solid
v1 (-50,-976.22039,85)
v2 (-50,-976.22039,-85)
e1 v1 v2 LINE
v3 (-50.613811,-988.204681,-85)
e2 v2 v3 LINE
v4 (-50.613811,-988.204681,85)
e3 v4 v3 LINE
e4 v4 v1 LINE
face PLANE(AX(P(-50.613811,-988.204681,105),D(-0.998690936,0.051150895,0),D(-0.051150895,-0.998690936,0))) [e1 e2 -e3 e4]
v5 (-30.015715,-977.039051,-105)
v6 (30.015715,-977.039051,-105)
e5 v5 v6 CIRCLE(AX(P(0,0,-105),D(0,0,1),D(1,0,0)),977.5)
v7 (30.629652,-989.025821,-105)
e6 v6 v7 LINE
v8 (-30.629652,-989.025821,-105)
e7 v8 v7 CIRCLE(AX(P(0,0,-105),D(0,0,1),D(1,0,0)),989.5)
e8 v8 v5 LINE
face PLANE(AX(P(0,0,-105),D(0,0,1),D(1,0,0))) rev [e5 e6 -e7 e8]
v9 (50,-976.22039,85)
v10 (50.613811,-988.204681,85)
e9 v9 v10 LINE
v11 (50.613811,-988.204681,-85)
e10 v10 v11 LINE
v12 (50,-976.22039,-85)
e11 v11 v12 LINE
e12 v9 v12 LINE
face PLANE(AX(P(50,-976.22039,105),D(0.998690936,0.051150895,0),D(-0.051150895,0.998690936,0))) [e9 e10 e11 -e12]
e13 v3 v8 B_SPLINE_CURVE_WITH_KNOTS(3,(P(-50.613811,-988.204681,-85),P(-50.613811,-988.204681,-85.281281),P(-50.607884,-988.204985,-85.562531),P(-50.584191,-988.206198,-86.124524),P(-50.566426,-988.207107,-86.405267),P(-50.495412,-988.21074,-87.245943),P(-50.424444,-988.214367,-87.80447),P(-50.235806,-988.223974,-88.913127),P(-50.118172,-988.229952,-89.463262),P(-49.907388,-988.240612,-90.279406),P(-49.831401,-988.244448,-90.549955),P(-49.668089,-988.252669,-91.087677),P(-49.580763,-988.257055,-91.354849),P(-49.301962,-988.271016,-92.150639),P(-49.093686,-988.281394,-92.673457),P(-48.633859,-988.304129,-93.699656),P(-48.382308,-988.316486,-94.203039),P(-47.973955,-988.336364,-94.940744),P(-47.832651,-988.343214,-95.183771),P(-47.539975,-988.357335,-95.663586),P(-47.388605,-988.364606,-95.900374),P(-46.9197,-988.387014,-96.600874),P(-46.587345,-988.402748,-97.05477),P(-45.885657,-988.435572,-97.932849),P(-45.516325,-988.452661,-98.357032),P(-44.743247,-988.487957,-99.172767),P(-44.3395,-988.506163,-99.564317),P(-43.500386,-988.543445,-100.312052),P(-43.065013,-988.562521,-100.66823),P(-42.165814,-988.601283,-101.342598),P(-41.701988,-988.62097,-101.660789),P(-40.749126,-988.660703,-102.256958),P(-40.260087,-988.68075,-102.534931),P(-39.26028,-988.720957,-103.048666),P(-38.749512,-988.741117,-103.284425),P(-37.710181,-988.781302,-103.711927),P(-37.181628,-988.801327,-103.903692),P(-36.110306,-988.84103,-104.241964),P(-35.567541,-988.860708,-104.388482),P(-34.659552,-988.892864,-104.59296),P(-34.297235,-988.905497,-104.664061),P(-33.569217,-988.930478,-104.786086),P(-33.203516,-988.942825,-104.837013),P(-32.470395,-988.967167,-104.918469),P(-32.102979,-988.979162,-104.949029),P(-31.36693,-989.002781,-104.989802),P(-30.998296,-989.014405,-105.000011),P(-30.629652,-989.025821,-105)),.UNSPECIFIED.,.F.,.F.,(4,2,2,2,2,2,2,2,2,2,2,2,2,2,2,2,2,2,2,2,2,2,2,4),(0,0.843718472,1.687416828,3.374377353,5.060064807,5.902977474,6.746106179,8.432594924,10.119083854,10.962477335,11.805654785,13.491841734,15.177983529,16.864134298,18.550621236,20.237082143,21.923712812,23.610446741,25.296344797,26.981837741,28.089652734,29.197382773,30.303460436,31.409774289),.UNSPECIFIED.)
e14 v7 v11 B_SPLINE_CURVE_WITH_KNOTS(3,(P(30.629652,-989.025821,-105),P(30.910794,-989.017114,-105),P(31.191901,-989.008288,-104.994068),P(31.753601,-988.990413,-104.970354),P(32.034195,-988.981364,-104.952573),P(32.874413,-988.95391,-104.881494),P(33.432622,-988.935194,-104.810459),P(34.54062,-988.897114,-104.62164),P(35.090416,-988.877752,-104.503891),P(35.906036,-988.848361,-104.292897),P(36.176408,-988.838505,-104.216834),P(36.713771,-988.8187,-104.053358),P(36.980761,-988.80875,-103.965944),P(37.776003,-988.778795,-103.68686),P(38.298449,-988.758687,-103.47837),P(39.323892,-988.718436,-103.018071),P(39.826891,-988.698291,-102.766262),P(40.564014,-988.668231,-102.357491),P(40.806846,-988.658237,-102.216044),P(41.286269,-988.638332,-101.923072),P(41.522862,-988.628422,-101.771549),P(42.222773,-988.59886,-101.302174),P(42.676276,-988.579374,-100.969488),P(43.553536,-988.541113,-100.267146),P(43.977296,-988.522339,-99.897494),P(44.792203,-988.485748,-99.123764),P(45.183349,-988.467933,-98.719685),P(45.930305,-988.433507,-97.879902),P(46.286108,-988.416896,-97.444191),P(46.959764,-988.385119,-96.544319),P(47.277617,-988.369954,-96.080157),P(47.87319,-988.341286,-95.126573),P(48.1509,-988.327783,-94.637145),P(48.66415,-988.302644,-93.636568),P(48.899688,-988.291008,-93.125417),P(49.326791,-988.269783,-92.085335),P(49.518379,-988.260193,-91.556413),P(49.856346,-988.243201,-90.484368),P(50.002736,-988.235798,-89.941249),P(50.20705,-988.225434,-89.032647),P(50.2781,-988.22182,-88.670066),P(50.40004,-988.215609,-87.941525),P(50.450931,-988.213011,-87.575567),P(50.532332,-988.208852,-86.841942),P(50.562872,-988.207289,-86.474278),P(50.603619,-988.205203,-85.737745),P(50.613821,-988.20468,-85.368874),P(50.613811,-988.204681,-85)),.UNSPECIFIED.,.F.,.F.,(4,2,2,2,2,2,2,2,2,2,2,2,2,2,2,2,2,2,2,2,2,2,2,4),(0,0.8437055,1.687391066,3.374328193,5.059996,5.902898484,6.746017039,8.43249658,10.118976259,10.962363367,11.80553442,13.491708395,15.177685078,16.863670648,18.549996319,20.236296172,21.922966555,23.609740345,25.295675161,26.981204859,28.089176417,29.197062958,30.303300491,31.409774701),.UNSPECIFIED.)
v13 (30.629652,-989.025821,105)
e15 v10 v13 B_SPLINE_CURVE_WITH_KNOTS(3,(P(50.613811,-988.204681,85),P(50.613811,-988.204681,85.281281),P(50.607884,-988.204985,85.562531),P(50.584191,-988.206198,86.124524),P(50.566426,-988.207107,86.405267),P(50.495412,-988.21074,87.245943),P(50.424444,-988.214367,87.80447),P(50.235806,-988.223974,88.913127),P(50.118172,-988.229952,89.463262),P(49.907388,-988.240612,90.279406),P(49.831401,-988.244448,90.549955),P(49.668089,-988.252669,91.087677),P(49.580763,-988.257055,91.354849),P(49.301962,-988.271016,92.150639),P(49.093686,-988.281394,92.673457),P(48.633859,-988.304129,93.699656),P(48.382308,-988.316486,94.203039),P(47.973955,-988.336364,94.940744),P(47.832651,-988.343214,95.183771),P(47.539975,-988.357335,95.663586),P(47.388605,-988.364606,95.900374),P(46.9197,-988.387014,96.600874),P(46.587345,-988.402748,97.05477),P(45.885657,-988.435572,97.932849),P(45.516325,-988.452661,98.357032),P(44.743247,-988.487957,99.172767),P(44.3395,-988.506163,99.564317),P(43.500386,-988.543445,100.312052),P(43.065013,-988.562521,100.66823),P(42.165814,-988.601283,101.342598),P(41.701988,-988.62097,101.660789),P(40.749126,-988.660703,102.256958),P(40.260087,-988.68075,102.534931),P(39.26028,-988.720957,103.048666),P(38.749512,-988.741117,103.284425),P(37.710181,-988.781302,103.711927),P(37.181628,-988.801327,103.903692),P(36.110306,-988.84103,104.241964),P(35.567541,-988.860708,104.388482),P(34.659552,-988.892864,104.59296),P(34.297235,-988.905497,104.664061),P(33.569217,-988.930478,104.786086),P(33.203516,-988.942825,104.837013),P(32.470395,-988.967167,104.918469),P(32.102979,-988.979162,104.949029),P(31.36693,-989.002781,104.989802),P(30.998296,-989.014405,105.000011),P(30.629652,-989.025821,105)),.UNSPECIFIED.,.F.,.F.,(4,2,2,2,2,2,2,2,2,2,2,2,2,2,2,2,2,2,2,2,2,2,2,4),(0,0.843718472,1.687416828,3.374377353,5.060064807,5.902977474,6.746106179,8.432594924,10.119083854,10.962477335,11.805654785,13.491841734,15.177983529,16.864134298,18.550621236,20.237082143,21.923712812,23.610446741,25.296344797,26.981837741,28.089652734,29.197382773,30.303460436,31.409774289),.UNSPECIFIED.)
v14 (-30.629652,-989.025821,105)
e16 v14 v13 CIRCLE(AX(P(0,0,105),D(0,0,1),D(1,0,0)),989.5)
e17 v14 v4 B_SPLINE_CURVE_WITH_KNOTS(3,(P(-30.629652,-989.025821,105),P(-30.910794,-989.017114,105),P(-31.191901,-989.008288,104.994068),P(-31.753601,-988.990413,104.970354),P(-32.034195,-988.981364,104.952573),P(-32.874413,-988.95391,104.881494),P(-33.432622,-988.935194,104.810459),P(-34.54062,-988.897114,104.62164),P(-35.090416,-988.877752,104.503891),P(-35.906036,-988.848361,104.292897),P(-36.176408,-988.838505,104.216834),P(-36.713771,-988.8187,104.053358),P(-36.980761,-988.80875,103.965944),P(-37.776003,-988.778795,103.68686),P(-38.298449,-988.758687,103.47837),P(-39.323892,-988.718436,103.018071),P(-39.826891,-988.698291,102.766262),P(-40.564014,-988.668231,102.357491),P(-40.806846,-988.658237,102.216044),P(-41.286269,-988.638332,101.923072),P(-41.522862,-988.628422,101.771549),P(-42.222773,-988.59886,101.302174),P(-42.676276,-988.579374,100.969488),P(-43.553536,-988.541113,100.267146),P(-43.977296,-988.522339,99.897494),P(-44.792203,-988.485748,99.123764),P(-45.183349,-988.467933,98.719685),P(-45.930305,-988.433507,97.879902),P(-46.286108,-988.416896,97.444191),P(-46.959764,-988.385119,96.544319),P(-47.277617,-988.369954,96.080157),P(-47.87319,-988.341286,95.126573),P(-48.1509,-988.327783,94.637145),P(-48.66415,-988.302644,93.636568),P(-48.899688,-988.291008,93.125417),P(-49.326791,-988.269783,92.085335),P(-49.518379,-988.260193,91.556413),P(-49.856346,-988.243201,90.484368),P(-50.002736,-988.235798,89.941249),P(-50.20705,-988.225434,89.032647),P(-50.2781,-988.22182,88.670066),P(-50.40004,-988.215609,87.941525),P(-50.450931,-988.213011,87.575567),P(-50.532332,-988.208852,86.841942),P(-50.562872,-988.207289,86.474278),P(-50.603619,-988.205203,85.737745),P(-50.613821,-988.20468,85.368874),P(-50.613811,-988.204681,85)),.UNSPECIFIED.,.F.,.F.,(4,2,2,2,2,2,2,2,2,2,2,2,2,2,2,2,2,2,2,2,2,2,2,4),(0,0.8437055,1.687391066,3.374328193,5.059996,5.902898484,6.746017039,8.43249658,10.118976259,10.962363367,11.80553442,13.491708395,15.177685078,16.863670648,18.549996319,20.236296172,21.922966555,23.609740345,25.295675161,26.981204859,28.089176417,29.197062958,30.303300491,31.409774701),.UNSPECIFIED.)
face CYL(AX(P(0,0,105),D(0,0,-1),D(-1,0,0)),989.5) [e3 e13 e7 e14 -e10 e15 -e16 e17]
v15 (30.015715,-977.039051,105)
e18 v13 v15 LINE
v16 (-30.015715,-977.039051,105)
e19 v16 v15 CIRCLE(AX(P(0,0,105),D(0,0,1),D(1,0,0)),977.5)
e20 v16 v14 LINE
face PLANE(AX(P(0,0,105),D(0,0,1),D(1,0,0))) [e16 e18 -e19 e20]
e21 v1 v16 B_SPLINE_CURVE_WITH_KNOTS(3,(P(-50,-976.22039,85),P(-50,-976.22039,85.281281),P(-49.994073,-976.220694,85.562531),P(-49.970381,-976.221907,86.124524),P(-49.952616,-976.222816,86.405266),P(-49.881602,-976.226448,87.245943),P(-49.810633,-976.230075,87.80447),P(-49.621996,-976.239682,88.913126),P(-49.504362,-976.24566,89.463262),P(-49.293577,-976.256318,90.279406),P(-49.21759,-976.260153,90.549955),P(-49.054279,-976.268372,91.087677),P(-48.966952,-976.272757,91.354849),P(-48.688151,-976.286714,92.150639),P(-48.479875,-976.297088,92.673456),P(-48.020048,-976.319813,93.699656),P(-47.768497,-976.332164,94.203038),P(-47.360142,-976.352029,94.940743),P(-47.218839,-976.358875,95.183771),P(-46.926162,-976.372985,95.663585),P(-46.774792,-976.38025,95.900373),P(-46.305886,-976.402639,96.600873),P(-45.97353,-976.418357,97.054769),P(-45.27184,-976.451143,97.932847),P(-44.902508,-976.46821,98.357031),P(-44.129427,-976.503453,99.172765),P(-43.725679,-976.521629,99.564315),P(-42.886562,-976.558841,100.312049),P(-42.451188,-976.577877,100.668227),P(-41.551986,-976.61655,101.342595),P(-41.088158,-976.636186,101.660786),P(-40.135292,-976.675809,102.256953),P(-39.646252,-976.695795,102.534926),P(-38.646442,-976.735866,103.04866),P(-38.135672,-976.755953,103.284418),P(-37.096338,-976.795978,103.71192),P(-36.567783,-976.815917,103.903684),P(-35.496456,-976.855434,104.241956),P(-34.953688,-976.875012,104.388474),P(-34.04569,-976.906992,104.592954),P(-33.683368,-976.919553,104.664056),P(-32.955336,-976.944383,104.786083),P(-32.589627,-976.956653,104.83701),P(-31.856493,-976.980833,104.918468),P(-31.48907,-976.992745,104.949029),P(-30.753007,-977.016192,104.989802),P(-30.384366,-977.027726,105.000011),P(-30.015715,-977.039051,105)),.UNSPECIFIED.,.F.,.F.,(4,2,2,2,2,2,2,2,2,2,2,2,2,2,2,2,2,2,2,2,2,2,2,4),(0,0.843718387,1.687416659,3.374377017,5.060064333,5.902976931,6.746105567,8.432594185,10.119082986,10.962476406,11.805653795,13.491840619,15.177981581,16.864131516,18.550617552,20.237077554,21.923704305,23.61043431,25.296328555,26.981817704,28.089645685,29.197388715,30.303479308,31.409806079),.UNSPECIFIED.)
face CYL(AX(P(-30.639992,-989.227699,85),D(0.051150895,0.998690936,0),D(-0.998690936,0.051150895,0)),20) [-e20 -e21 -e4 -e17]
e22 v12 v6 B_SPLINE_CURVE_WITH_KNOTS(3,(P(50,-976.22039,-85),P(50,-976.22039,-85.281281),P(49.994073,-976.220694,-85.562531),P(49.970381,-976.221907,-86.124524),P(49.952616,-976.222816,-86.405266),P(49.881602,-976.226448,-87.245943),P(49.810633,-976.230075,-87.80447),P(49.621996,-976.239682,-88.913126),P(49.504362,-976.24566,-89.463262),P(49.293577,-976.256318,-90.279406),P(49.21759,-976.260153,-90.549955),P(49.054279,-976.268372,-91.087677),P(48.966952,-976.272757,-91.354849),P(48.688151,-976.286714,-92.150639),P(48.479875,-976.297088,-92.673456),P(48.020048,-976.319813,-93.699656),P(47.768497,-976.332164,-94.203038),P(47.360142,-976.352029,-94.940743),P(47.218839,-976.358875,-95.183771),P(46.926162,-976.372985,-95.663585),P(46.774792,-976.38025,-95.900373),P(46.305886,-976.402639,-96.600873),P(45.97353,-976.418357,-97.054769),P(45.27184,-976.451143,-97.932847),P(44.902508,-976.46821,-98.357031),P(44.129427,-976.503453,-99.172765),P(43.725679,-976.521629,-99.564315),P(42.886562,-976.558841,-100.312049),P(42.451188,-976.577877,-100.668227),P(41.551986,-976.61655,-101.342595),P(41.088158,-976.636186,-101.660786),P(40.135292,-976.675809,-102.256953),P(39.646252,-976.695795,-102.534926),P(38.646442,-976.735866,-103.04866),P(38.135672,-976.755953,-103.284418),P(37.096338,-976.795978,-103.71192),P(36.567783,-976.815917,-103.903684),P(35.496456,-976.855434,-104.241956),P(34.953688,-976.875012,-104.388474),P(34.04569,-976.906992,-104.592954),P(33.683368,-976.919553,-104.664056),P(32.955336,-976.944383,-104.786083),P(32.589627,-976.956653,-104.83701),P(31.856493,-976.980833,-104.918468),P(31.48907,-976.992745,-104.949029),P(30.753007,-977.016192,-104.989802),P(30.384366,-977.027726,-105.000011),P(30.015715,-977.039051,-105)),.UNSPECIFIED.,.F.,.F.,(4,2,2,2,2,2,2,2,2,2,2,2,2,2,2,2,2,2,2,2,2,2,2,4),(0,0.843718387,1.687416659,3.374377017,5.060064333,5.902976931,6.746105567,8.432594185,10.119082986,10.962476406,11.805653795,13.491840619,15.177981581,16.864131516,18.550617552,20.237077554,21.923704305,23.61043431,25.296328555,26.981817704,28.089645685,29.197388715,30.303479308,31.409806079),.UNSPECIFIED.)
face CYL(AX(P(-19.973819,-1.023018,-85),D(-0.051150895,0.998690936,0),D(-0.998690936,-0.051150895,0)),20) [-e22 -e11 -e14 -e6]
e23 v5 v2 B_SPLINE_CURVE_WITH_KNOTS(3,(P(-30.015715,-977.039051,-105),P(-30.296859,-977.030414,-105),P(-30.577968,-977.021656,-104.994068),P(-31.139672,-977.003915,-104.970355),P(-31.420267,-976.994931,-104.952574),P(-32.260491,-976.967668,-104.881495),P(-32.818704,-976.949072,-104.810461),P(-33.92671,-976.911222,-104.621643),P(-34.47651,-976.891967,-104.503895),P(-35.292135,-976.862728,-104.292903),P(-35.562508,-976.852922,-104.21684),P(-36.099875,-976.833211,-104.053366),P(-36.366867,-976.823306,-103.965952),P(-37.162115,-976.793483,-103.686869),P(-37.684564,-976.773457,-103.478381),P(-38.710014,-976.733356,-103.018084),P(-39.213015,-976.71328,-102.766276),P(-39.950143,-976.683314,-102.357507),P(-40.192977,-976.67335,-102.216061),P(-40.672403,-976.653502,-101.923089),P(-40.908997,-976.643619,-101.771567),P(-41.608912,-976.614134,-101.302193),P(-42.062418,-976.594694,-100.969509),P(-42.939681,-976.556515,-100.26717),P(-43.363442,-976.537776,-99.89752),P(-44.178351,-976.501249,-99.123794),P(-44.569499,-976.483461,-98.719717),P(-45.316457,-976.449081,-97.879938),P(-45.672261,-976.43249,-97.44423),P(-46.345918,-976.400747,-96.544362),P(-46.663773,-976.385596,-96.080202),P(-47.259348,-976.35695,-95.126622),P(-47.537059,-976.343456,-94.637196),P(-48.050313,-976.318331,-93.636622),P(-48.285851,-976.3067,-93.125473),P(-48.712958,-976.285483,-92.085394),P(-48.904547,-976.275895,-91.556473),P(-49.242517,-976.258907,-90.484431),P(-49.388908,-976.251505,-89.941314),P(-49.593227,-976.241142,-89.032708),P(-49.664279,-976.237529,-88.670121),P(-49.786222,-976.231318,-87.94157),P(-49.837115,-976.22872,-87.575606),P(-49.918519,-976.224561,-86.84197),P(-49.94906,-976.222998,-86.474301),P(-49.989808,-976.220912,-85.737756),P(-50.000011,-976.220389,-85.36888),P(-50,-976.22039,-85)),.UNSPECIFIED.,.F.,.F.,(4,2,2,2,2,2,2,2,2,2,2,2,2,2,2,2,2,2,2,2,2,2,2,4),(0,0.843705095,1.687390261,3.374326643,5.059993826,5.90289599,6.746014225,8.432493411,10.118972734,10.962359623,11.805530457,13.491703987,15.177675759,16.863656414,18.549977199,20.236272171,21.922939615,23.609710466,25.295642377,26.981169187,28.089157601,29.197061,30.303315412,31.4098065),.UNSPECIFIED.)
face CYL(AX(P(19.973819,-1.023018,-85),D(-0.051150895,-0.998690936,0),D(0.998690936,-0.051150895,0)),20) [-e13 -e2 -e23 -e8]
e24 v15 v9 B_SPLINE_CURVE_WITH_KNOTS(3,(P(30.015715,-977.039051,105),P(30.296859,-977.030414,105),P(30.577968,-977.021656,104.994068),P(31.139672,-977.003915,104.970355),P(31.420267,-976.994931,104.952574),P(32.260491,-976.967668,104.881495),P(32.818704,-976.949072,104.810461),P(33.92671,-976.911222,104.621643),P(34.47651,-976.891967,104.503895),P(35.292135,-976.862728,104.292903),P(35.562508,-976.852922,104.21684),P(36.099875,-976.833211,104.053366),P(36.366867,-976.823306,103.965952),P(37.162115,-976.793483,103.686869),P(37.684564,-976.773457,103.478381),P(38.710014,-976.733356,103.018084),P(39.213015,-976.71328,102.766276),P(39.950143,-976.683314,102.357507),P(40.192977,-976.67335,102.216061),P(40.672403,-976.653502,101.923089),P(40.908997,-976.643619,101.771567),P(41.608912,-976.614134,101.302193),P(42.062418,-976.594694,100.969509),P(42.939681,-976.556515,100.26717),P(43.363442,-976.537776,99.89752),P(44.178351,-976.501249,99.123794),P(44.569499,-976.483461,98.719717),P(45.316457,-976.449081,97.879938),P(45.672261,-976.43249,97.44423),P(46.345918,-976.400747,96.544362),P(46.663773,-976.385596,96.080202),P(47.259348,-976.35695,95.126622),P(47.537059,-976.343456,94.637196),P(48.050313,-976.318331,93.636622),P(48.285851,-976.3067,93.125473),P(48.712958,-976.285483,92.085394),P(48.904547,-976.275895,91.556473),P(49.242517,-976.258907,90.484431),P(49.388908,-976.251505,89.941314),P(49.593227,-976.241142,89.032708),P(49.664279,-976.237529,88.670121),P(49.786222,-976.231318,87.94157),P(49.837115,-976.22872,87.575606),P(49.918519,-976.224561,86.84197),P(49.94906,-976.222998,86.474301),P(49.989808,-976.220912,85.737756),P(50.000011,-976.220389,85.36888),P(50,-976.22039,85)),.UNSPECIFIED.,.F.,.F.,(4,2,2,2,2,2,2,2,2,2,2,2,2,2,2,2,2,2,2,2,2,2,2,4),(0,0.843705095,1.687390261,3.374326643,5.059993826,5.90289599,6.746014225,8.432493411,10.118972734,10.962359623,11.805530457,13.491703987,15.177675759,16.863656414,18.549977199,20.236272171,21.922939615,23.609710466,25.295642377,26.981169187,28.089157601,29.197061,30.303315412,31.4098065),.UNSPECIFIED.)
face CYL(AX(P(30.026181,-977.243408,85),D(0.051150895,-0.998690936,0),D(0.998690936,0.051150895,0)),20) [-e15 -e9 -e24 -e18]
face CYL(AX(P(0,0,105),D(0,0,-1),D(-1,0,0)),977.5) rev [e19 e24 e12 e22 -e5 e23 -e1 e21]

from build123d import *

# Parameters (mm, degrees)
SM_BASE_FLANGE_1_DEPTH = 105
FILLET_1_R             = 20


# Sheet-metal steps are written as plain solids
with BuildPart() as part:
    # Sketch 1 → 基体-法兰1 (new, symmetric)
    with BuildSketch(Plane.XY):
        with BuildLine():
            ThreePointArc((-50, -976.220390076), (0, -977.5), (50, -976.220390076))
            Line((50, -976.220390076), (50.613810742, -988.20468131))
            ThreePointArc((50.613810742, -988.20468131), (0, -989.5), (-50.613810742, -988.20468131))
            Line((-50.613810742, -988.20468131), (-50, -976.220390076))
        make_face()
    extrude(amount=SM_BASE_FLANGE_1_DEPTH, both=True)

    # 圆角1
    fillet_1_edges = [part.edges().sort_by_distance(p)[0] for p in [
        (-50.306905371, -982.212535693, 105),
        (-50.306905371, -982.212535693, -105),
        (50.306905371, -982.212535693, -105),
        (50.306905371, -982.212535693, 105),
    ]]
    fillet(fillet_1_edges, radius=FILLET_1_R)


solid = part.part
